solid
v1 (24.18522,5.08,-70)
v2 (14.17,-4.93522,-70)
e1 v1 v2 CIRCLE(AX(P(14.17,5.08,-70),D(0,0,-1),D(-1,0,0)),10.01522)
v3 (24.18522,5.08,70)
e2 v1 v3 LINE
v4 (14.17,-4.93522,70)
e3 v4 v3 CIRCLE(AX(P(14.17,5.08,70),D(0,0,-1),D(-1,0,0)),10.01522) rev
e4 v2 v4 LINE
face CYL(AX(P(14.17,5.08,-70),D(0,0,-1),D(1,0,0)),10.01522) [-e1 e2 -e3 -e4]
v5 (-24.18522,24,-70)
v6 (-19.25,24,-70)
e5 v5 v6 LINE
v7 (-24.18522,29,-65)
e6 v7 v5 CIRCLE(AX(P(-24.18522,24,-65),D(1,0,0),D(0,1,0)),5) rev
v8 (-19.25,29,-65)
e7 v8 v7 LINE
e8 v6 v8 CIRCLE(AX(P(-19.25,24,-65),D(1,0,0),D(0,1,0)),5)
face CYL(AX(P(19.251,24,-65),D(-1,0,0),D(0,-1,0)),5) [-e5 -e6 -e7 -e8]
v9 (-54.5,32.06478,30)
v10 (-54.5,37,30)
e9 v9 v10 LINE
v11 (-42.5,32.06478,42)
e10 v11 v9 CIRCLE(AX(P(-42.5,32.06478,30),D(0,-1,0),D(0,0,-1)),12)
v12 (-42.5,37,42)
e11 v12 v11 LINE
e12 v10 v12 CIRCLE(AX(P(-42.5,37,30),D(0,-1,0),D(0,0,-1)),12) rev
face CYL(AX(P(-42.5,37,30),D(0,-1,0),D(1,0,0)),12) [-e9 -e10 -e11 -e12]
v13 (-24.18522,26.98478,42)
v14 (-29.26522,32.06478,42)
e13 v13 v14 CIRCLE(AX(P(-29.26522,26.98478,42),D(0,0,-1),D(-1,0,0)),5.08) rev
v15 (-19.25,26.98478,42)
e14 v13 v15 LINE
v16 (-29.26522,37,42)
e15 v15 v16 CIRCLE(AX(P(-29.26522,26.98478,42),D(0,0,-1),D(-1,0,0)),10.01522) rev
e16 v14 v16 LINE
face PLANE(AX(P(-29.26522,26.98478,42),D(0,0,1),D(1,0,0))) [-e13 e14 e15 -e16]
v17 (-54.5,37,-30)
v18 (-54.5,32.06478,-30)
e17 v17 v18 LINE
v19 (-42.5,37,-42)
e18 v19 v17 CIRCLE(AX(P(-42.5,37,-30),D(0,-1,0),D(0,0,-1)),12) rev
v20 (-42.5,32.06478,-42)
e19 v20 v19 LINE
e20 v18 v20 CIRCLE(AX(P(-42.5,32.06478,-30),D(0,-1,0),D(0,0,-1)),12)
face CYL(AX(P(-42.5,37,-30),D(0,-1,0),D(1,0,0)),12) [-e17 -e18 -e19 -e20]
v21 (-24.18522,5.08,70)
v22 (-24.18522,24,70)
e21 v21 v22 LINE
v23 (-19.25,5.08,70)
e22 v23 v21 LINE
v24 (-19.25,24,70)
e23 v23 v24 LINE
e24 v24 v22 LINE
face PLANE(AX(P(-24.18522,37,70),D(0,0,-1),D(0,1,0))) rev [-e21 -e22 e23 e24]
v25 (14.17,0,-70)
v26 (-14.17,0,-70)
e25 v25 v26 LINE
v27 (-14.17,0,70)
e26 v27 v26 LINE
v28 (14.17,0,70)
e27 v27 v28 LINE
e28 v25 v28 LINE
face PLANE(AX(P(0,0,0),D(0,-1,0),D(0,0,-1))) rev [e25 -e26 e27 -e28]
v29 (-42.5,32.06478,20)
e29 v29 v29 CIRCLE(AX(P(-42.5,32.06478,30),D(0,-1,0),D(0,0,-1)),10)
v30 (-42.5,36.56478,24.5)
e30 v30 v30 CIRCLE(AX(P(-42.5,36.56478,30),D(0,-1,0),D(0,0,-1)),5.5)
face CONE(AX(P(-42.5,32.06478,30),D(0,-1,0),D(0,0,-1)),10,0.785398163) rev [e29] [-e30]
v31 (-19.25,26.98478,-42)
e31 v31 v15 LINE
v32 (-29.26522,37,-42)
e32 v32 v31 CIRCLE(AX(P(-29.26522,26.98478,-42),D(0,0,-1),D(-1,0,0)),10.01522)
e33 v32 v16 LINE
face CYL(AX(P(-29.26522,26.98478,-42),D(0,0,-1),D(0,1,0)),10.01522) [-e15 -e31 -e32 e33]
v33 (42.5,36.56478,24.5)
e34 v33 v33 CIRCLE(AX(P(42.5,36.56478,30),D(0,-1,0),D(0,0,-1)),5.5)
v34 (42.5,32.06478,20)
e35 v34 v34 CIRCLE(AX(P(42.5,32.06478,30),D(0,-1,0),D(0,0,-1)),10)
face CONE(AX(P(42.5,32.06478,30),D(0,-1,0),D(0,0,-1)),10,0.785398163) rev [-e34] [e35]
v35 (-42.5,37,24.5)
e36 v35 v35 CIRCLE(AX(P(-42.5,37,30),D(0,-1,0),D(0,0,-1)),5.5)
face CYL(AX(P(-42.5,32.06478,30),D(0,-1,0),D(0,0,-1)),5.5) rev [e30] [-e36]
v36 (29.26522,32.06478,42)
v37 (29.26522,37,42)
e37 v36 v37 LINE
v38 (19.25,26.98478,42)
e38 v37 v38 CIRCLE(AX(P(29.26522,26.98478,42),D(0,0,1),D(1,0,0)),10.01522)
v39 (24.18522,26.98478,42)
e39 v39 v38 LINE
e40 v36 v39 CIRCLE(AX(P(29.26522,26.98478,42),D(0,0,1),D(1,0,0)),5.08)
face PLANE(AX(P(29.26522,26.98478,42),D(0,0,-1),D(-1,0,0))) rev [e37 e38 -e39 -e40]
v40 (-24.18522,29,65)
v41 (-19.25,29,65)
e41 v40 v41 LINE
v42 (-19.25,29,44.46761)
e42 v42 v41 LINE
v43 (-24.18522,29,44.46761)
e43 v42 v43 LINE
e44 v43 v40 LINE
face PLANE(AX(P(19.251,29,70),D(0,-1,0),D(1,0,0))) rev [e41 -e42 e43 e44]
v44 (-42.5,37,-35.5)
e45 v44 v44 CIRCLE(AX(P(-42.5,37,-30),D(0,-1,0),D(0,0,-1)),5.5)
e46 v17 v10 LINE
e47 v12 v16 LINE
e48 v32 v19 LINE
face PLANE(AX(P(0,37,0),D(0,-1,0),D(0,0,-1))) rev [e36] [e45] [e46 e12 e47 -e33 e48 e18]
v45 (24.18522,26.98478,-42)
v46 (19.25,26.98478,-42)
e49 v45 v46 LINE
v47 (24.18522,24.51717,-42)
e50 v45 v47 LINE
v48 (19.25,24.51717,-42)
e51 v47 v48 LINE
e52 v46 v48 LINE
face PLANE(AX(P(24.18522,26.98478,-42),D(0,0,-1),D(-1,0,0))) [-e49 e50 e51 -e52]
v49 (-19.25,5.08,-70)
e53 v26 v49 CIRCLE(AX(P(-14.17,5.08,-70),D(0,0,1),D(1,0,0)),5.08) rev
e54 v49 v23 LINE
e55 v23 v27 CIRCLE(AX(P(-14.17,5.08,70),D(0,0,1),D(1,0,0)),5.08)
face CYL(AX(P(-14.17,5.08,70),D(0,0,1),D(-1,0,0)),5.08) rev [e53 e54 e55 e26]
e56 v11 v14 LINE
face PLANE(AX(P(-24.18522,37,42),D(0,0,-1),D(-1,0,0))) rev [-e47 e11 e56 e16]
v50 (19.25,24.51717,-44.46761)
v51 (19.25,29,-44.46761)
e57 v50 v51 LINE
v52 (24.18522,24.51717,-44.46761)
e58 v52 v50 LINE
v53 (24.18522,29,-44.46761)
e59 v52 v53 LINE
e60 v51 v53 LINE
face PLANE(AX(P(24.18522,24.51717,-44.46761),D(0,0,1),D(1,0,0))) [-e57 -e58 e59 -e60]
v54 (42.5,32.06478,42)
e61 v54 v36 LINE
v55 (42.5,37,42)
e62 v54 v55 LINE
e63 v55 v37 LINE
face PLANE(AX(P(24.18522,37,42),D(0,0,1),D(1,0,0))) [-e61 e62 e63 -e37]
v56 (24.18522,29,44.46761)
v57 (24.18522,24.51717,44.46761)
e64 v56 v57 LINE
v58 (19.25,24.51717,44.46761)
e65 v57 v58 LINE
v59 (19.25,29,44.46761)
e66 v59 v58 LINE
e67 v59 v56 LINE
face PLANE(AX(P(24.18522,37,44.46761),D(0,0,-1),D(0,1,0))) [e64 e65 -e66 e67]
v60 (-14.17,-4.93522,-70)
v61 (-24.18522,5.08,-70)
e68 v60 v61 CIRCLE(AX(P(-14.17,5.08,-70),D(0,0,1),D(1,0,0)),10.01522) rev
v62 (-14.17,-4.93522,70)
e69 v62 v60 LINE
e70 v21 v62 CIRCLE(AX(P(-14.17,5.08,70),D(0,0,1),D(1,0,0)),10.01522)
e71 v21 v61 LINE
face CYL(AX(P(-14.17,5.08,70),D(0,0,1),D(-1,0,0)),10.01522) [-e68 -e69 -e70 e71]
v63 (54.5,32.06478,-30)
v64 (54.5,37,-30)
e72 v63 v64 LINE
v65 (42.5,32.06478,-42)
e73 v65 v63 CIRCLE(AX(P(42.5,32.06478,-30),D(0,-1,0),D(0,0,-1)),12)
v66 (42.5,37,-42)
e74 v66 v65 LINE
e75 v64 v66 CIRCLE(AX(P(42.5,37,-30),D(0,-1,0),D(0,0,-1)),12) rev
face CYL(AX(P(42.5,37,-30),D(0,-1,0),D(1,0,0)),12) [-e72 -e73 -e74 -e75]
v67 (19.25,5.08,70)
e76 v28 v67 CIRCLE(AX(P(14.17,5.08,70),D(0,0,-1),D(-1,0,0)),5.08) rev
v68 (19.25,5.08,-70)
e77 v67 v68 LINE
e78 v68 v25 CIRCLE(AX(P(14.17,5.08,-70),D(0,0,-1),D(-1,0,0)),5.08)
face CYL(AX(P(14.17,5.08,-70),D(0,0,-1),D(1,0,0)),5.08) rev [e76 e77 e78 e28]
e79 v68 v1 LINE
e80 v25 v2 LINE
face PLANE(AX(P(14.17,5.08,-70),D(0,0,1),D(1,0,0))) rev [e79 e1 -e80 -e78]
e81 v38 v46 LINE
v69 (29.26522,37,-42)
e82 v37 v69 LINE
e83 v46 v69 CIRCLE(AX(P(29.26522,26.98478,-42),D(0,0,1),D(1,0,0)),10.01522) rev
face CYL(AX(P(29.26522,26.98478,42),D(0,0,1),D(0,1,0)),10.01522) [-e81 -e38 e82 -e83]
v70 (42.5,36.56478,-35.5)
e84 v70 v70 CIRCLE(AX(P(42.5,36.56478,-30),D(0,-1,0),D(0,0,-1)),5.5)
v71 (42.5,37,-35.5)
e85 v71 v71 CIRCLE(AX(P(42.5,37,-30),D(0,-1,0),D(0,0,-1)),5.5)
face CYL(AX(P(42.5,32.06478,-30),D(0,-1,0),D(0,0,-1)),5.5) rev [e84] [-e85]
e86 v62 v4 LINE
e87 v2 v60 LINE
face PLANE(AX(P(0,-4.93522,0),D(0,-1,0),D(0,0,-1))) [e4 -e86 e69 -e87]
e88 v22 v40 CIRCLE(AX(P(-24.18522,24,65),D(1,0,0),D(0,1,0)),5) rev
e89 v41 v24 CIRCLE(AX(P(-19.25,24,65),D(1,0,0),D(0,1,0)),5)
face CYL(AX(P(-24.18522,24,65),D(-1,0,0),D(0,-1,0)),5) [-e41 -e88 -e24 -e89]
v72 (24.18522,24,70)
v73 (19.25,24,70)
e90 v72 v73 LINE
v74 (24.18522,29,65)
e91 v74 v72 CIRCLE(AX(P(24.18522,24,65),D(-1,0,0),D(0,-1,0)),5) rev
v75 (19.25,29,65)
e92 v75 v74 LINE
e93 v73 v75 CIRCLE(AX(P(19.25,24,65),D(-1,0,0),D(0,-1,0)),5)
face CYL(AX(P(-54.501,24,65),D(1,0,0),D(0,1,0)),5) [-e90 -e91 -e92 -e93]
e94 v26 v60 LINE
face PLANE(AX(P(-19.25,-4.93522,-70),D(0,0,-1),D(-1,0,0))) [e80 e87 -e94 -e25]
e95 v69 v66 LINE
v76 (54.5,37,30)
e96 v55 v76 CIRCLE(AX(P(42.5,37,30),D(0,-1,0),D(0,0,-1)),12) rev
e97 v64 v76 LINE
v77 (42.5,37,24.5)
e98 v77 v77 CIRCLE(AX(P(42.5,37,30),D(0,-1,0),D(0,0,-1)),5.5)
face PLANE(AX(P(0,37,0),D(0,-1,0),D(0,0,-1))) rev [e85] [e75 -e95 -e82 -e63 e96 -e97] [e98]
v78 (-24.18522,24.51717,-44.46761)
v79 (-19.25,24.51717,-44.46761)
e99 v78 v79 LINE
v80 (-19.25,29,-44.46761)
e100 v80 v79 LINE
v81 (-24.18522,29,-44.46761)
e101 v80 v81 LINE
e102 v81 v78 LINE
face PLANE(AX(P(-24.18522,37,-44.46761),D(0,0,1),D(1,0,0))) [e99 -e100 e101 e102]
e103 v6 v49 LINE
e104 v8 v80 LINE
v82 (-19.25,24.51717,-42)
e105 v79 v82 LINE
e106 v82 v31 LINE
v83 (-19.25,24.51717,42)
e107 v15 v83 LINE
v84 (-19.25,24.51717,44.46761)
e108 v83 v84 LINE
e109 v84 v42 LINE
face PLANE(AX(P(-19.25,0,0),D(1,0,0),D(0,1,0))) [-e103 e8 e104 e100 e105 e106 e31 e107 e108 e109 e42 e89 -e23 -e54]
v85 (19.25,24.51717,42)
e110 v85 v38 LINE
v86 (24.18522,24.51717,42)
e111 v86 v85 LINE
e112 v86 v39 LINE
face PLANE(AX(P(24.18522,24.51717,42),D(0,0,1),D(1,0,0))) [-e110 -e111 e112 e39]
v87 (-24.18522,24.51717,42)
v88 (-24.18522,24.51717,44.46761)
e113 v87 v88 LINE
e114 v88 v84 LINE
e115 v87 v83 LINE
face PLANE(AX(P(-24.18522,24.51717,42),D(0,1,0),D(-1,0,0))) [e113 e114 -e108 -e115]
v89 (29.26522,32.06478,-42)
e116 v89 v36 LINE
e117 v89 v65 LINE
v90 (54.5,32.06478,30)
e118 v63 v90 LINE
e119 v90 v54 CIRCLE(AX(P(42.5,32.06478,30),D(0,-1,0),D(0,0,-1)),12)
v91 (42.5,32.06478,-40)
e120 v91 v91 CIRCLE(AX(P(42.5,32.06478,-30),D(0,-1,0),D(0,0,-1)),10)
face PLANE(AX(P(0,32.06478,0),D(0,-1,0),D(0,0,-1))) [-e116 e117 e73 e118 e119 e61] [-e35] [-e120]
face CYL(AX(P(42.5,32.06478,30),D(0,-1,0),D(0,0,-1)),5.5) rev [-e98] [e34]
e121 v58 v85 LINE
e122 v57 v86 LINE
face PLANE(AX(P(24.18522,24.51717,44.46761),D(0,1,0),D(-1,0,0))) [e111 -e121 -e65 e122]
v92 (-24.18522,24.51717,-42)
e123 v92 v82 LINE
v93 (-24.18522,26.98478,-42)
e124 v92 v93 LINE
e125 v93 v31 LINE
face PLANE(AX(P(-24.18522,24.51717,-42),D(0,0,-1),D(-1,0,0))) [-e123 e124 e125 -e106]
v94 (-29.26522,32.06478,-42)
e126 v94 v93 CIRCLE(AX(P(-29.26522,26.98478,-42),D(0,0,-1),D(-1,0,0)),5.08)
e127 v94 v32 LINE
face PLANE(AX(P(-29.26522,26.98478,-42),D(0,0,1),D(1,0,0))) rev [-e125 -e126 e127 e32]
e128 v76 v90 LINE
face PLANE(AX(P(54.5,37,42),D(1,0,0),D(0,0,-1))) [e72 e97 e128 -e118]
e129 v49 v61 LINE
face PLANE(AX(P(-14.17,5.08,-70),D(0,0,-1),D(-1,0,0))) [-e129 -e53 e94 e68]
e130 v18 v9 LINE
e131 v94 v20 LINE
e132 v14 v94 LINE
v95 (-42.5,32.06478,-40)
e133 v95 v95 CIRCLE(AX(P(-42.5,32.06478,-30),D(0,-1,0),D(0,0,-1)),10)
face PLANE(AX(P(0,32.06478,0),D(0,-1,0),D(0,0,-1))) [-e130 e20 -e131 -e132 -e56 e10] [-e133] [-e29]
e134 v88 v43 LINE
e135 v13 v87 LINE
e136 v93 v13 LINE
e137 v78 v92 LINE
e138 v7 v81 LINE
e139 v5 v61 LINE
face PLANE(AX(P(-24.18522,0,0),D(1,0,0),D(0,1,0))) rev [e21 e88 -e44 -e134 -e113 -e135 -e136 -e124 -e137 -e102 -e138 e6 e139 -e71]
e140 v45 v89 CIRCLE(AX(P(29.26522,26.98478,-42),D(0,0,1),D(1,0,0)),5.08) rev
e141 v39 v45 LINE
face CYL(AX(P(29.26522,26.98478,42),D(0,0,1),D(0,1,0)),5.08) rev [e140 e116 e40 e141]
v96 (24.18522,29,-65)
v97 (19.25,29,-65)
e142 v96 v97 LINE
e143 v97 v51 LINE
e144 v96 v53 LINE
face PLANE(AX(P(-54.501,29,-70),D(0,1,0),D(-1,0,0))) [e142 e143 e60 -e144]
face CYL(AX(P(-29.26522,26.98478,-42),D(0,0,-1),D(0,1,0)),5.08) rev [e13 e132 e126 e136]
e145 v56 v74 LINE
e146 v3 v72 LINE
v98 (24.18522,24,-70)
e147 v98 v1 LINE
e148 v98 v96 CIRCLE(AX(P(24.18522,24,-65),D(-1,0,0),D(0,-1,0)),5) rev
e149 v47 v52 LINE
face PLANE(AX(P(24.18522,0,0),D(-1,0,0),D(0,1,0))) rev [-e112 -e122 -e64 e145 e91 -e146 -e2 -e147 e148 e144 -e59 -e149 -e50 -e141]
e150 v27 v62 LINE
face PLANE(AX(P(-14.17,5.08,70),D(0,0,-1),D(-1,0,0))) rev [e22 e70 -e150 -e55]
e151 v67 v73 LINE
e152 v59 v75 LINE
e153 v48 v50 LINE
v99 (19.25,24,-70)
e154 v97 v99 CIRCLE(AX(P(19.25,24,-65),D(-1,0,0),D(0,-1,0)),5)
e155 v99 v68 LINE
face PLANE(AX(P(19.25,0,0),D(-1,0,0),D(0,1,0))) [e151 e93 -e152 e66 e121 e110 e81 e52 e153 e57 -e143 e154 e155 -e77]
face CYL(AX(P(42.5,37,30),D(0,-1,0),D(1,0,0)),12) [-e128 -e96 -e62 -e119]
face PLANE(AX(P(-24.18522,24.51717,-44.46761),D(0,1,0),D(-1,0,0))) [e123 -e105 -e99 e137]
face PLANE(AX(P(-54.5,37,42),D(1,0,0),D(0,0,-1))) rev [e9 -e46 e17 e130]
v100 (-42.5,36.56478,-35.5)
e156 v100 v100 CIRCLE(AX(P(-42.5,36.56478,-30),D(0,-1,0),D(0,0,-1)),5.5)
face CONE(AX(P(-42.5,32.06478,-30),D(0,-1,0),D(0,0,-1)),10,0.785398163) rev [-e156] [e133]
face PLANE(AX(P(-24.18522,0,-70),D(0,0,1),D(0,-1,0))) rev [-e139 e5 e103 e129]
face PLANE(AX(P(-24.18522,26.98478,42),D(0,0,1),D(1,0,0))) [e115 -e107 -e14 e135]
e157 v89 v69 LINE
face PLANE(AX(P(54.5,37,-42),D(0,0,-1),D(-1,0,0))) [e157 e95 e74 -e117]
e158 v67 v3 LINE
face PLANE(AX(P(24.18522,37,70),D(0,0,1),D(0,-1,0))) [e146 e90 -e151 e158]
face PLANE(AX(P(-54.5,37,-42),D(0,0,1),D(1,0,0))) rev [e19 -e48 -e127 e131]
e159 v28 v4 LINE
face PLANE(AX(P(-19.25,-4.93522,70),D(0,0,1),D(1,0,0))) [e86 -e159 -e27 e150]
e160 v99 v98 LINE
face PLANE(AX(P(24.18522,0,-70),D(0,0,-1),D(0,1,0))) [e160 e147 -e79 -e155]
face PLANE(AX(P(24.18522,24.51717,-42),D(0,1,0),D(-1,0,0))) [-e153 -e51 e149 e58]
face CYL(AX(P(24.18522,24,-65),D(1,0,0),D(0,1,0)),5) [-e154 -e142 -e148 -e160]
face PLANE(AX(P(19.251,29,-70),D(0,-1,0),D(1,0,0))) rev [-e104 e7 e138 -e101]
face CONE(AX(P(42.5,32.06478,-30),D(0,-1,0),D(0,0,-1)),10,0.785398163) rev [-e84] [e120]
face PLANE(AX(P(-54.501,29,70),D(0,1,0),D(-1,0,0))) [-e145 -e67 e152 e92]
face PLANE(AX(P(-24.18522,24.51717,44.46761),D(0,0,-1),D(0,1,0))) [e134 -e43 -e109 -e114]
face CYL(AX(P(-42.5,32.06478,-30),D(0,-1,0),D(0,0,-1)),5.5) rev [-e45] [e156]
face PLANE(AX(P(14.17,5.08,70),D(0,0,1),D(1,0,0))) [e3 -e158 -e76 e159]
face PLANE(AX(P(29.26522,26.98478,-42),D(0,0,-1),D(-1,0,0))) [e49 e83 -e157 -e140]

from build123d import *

# Parameters (mm, degrees)
SKETCH1_W                                     = 38.5
SKETCH1_H                                     = 140
BASE_FLANGE1_DEPTH                            = 4.93522
EDGE_FLANGE1_STRIP_W                          = 29.90088
EDGE_FLANGE1_STRIP_H                          = 4.93522
EDGE_FLANGE1_STRIP_CUT_DEPTH                  = 140
EDGE_FLANGE1_DEPTH                            = 140
EDGE_FLANGE2_STRIP_W                          = 29.90088
EDGE_FLANGE2_STRIP_H                          = 4.93522
EDGE_FLANGE2_STRIP_CUT_DEPTH                  = 84
EDGE_FLANGE2_RELIEF_W                         = 32.36849
EDGE_FLANGE2_RELIEF_H                         = 2.46761
EDGE_FLANGE2_RELIEF_CUT_DEPTH                 = 4.93522
EDGE_FLANGE2_DEPTH                            = 84
FILLET1_R                                     = 12
CUT_EXTRUDE1_REACH                            = 92.308
SKETCH20_W                                    = 25.53239
SKETCH20_H                                    = 8
FILLET2_R                                     = 5
FILLET1_OF_MIRROR1_R                          = 12
FILLET2_OF_MIRROR1_R                          = 5
CSK_FOR_M10_FLAT_HEAD_MACHINE_SCREW1_AT_COUNT = 2
CSK_FOR_M10_FLAT_HEAD_MACHINE_SCREW1_AT_PITCH = 52.021630117
CSK_FOR_M10_FLAT_HEAD_MACHINE_SCREW1_2_COUNT  = 2
CSK_FOR_M10_FLAT_HEAD_MACHINE_SCREW1_2_PITCH  = 104.043260233
CSK_FOR_M10_FLAT_HEAD_MACHINE_SCREW1_3_COUNT  = 2
CSK_FOR_M10_FLAT_HEAD_MACHINE_SCREW1_3_PITCH  = 85
CSK_FOR_M10_FLAT_HEAD_MACHINE_SCREW1_4_COUNT  = 2
CSK_FOR_M10_FLAT_HEAD_MACHINE_SCREW1_4_PITCH  = 60


# Sheet-metal steps are written as plain solids
with BuildPart() as part:
    # Sketch1 → Base-Flange1 (new body)
    with BuildSketch(Plane(origin=(0, 0, 0), x_dir=(1, 0, 0), z_dir=(0, 1, 0))):
        Rectangle(SKETCH1_W, SKETCH1_H)
    extrude(amount=-BASE_FLANGE1_DEPTH)

    # Edge-Flange1 strip (across the edge) → Edge-Flange1 strip cut (cut)
    with BuildSketch(Plane(origin=(-19.25, 0, -70), x_dir=(1, 0, 0), z_dir=(0, 0, 1))):
        with Locations((-9.87044, -2.46761)):
            Rectangle(EDGE_FLANGE1_STRIP_W, EDGE_FLANGE1_STRIP_H)
    edge_flange1_strip_cut = extrude(amount=EDGE_FLANGE1_STRIP_CUT_DEPTH, mode=Mode.SUBTRACT)

    # Edge-Flange1 section (across the edge) → Edge-Flange1 (add)
    with BuildSketch(Plane(origin=(-19.25, 0, -70), x_dir=(1, 0, 0), z_dir=(0, 0, 1))):
        with BuildLine():
            Line((-4.93522, 5.08), (-4.93522, 37))
            Line((-4.93522, 37), (0, 37))
            Line((0, 37), (0, 5.08))
            ThreePointArc((0, 5.08), (1.487897552, 1.487897552), (5.08, 0))
            Line((5.08, 0), (5.08, -4.93522))
            ThreePointArc((5.08, -4.93522), (-2.001829977, -2.001829977), (-4.93522, 5.08))
        make_face()
    edge_flange1 = extrude(amount=EDGE_FLANGE1_DEPTH)

    # Edge-Flange2 strip (across the edge) → Edge-Flange2 strip cut (cut)
    with BuildSketch(Plane(origin=(-24.18522, 37, 42), x_dir=(0, -1, 0), z_dir=(0, 0, -1))):
        with Locations((-4.93522, -2.46761)):
            Rectangle(EDGE_FLANGE2_STRIP_W, EDGE_FLANGE2_STRIP_H)
    edge_flange2_strip_cut = extrude(amount=EDGE_FLANGE2_STRIP_CUT_DEPTH, mode=Mode.SUBTRACT)

    # Edge-Flange2 relief (on the sheet) → Edge-Flange2 relief cut (cut)
    with BuildSketch(Plane(origin=(-24.18522, 26.98478, 42), x_dir=(0, -1, 0), z_dir=(-1, 0, 0))):
        with Locations((-13.716635, 1.233805)):
            Rectangle(EDGE_FLANGE2_RELIEF_W, EDGE_FLANGE2_RELIEF_H)
        with Locations((-13.716635, -85.233805)):
            Rectangle(EDGE_FLANGE2_RELIEF_W, EDGE_FLANGE2_RELIEF_H)
    edge_flange2_relief_cut = extrude(amount=-EDGE_FLANGE2_RELIEF_CUT_DEPTH, mode=Mode.SUBTRACT)

    # Edge-Flange2 section (across the edge) → Edge-Flange2 (add)
    with BuildSketch(Plane(origin=(-24.18522, 37, 42), x_dir=(0, -1, 0), z_dir=(0, 0, -1))):
        with BuildLine():
            Line((0, 5.08), (0, 30.31478))
            Line((0, 30.31478), (4.93522, 30.31478))
            Line((4.93522, 30.31478), (4.93522, 5.08))
            ThreePointArc((4.93522, 5.08), (6.423117552, 1.487897552), (10.01522, 0))
            Line((10.01522, 0), (10.01522, -4.93522))
            ThreePointArc((10.01522, -4.93522), (2.933390023, -2.001829977), (0, 5.08))
        make_face()
    edge_flange2 = extrude(amount=EDGE_FLANGE2_DEPTH)

    # Fillet1
    fillet1_edges = [part.edges().sort_by_distance(p)[0] for p in [
        (-54.5, 34.53239, 42),
        (-54.5, 34.53239, -42),
    ]]
    fillet(fillet1_edges, radius=FILLET1_R)

    # Sketch20 → Cut-Extrude1 (cut, up to next)
    with BuildSketch(Plane.ZY.offset(24.18522), mode=Mode.PRIVATE) as cut_extrude1_sk1:
        with Locations((-57.233805, 33)):
            Rectangle(SKETCH20_W, SKETCH20_H)
    cut_extrude1_tool1 = extrude(cut_extrude1_sk1.sketch, amount=-CUT_EXTRUDE1_REACH, mode=Mode.PRIVATE) & part.part
    # Sketch20 → Cut-Extrude1 (cut, up to next)
    with BuildSketch(Plane.ZY.offset(24.18522), mode=Mode.PRIVATE) as cut_extrude1_sk2:
        with Locations((57.233805, 33)):
            Rectangle(SKETCH20_W, SKETCH20_H)
    cut_extrude1_tool2 = extrude(cut_extrude1_sk2.sketch, amount=-CUT_EXTRUDE1_REACH, mode=Mode.PRIVATE) & part.part
    cut_extrude1_1 = cut_extrude1_tool1.solids().sort_by_distance((-24.18522, 33, -57.233805))[0]
    add(cut_extrude1_1, mode=Mode.SUBTRACT)
    cut_extrude1_2 = cut_extrude1_tool2.solids().sort_by_distance((-24.18522, 33, 57.233805))[0]
    add(cut_extrude1_2, mode=Mode.SUBTRACT)
    cut_extrude1 = cut_extrude1_1 + cut_extrude1_2  # Cut-Extrude1 as one shape, for the pattern or mirror that repeats it

    # Fillet2
    fillet2_edges = [part.edges().sort_by_distance(p)[0] for p in [
        (-21.71761, 29, -70),
        (-21.71761, 29, 70),
    ]]
    fillet(fillet2_edges, radius=FILLET2_R)

    # Mirror1: Edge-Flange1 strip cut, Edge-Flange1, Edge-Flange2 strip cut, Edge-Flange2 relief cut, Edge-Flange2, Cut-Extrude1 across plane
    add(edge_flange1_strip_cut.mirror(Plane(origin=(0, 0, 0), x_dir=(0, 0, 1), z_dir=(1, 0, 0))), mode=Mode.SUBTRACT)
    add(edge_flange1.mirror(Plane(origin=(0, 0, 0), x_dir=(0, 0, 1), z_dir=(1, 0, 0))))
    add(edge_flange2_strip_cut.mirror(Plane(origin=(0, 0, 0), x_dir=(0, 0, 1), z_dir=(1, 0, 0))), mode=Mode.SUBTRACT)
    add(edge_flange2_relief_cut.mirror(Plane(origin=(0, 0, 0), x_dir=(0, 0, 1), z_dir=(1, 0, 0))), mode=Mode.SUBTRACT)
    add(edge_flange2.mirror(Plane(origin=(0, 0, 0), x_dir=(0, 0, 1), z_dir=(1, 0, 0))))
    add(cut_extrude1.mirror(Plane(origin=(0, 0, 0), x_dir=(0, 0, 1), z_dir=(1, 0, 0))), mode=Mode.SUBTRACT)

    # Fillet1 of Mirror1
    fillet1_of_mirror1_edges = [part.edges().sort_by_distance(p)[0] for p in [
        (54.5, 34.53239, 42),
        (54.5, 34.53239, -42),
    ]]
    fillet(fillet1_of_mirror1_edges, radius=FILLET1_OF_MIRROR1_R)

    # Fillet2 of Mirror1
    fillet2_of_mirror1_edges = [part.edges().sort_by_distance(p)[0] for p in [
        (21.71761, 29, -70),
        (21.71761, 29, 70),
    ]]
    fillet(fillet2_of_mirror1_edges, radius=FILLET2_OF_MIRROR1_R)

    # Sketch30 → CSK for M10 Flat Head Machine Screw1 (revolve, cut)
    with BuildSketch(Plane(origin=(42.5, 32.06478, 30), x_dir=(0, 0, -1), z_dir=(1, 0, 0))):
        Polygon((0, 0), (0, 4.93522), (5.5, 4.93522), (5.5, 4.5), (10, 0), align=None)
    csk_for_m10_flat_head_machine_screw1 = revolve(axis=Axis((42.5, 25.71478, 30), (0, 1, 0)), mode=Mode.SUBTRACT)

    # CSK for M10 Flat Head Machine Screw1 at: CSK for M10 Flat Head Machine Screw1 ×2
    with Locations(*[Vector(-0.8169678632647617, 0, -0.5766831975986554) * (i * CSK_FOR_M10_FLAT_HEAD_MACHINE_SCREW1_AT_PITCH) for i in range(1, CSK_FOR_M10_FLAT_HEAD_MACHINE_SCREW1_AT_COUNT)]):
        add(csk_for_m10_flat_head_machine_screw1, mode=Mode.SUBTRACT)

    # CSK for M10 Flat Head Machine Screw1 2: CSK for M10 Flat Head Machine Screw1 ×2
    with Locations(*[Vector(-0.8169678632647617, 0, -0.5766831975986554) * (i * CSK_FOR_M10_FLAT_HEAD_MACHINE_SCREW1_2_PITCH) for i in range(1, CSK_FOR_M10_FLAT_HEAD_MACHINE_SCREW1_2_COUNT)]):
        add(csk_for_m10_flat_head_machine_screw1, mode=Mode.SUBTRACT)

    # CSK for M10 Flat Head Machine Screw1 3: CSK for M10 Flat Head Machine Screw1 ×2
    with Locations(*[(-i * CSK_FOR_M10_FLAT_HEAD_MACHINE_SCREW1_3_PITCH, 0, 0) for i in range(1, CSK_FOR_M10_FLAT_HEAD_MACHINE_SCREW1_3_COUNT)]):
        add(csk_for_m10_flat_head_machine_screw1, mode=Mode.SUBTRACT)

    # CSK for M10 Flat Head Machine Screw1 4: CSK for M10 Flat Head Machine Screw1 ×2
    with Locations(*[(0, 0, -i * CSK_FOR_M10_FLAT_HEAD_MACHINE_SCREW1_4_PITCH) for i in range(1, CSK_FOR_M10_FLAT_HEAD_MACHINE_SCREW1_4_COUNT)]):
        add(csk_for_m10_flat_head_machine_screw1, mode=Mode.SUBTRACT)


solid = part.part
